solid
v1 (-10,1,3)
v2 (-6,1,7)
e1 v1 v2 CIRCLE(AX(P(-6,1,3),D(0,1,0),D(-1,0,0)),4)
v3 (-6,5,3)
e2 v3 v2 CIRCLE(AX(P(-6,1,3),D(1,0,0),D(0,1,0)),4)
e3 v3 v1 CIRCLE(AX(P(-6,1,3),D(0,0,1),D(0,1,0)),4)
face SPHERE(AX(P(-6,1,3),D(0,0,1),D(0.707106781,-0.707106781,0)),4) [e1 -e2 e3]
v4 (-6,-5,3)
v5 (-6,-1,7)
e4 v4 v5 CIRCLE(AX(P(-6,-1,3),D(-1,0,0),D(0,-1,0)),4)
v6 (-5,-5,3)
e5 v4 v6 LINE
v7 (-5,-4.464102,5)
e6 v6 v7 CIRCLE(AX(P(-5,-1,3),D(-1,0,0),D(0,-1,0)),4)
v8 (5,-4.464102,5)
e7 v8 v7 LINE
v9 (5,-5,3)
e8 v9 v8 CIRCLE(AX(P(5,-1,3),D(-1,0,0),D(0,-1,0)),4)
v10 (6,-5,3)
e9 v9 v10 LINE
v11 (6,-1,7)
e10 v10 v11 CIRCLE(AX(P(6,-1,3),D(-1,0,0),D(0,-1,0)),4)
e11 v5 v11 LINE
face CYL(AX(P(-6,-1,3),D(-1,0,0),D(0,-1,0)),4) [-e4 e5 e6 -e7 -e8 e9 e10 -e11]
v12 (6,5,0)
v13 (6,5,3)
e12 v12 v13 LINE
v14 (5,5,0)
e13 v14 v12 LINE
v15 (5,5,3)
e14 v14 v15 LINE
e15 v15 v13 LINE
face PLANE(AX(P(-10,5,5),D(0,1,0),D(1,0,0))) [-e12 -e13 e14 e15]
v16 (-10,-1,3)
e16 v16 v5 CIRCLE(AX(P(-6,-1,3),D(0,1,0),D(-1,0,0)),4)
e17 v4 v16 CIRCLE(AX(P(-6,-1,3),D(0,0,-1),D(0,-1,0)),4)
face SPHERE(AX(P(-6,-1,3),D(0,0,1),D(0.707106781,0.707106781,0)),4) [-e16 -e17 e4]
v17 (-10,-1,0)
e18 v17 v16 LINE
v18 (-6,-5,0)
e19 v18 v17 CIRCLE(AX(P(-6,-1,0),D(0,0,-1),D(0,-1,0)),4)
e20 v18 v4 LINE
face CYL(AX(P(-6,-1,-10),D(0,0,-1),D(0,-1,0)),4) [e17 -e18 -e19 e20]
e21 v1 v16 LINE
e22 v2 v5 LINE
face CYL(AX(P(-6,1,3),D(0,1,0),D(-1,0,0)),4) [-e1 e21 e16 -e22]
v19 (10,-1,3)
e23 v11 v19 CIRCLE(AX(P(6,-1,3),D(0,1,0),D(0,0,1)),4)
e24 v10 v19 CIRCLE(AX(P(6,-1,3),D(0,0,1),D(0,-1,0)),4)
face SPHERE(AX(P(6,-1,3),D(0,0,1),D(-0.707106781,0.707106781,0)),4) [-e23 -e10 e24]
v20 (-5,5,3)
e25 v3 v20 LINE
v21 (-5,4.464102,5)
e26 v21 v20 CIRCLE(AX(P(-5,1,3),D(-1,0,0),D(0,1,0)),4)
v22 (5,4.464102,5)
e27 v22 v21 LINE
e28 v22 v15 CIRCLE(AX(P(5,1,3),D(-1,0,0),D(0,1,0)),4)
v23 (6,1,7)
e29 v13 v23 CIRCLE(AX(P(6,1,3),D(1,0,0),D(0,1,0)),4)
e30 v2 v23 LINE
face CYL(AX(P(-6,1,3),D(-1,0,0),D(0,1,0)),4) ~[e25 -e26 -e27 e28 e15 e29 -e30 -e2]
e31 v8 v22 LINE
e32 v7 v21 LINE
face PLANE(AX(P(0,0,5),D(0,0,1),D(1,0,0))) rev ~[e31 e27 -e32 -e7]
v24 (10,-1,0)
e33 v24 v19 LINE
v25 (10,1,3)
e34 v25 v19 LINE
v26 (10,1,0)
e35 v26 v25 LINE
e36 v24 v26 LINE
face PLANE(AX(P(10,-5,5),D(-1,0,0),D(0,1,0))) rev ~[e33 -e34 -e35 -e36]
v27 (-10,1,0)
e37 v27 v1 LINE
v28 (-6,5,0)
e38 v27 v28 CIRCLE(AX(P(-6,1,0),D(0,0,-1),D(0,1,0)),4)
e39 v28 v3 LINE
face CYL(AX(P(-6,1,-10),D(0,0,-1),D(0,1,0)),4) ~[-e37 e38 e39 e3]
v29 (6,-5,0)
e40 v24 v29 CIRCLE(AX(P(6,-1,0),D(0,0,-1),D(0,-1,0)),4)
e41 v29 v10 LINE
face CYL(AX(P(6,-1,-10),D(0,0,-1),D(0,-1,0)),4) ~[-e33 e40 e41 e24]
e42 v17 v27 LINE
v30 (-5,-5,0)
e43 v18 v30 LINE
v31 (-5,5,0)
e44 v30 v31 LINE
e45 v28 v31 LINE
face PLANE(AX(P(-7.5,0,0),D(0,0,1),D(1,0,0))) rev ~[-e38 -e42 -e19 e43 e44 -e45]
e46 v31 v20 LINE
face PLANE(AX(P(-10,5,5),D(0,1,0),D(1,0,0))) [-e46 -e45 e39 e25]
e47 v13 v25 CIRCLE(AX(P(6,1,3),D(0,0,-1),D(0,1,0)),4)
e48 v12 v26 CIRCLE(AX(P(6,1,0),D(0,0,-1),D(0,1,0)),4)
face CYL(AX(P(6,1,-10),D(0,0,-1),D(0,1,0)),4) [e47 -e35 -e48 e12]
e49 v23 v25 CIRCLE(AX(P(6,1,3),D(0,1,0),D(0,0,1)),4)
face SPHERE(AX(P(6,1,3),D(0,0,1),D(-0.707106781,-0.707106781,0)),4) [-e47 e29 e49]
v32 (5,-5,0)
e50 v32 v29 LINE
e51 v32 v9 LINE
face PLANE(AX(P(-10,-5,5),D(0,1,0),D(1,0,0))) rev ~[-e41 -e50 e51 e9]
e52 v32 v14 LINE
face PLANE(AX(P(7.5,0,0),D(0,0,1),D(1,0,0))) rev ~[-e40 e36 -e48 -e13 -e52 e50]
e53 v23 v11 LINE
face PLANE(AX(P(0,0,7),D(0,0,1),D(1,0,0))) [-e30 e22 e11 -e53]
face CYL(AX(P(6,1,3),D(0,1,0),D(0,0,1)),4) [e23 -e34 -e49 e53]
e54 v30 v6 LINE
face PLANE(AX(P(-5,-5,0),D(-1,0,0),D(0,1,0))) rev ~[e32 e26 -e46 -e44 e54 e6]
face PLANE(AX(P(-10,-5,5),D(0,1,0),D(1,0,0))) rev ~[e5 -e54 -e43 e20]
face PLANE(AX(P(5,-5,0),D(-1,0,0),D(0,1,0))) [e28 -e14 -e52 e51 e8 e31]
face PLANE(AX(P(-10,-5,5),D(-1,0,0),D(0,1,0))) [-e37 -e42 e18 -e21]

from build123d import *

# Parameters (mm, degrees)
F0_W         = 5
F0_H         = 10
F1_DEPTH     = 5
F2_W         = 20
F2_H         = 10
F3_DEPTH     = 2
F4_T1_DEPTH  = 2
F4_T3_DEPTH  = 12
F4_T5_DEPTH  = 13
F4_S9_W      = 4
F4_S9_H      = 4
F4_T10_DEPTH = 4
F4_S15_W     = 4
F4_S15_H     = 4
F4_T16_DEPTH = 4
F4_S21_W     = 4
F4_S21_H     = 4
F4_T22_DEPTH = 4
F4_S27_W     = 4
F4_S27_H     = 4
F4_T28_DEPTH = 4


# Not quite as in the source:
# - a fillet or chamfer that OpenCascade refuses, or shapes differently, is made with other operations: its cross-section is extruded or revolved along the edge and cut away or added


with BuildPart() as f1:
    # F0 (on Top) → F1 (new body)
    with BuildSketch(Plane.XY):
        with Locations((-7.5, 0)):
            Rectangle(F0_W, F0_H)
    extrude(amount=F1_DEPTH)



with BuildPart() as f1b:
    # F0 (on Top) → F1, piece 2 (new body)
    with BuildSketch(Plane.XY):
        with Locations((7.5, 0)):
            Rectangle(F0_W, F0_H)
    extrude(amount=F1_DEPTH)


with BuildPart() as f1_1:
    add(f1.part)

    add(f1b.part)  # F3 merges F1b
    # F2 (on face) → F3 (join)
    with BuildSketch(Plane.XY.offset(5)):
        Rectangle(F2_W, F2_H)
    extrude(amount=F3_DEPTH)

    # F4: fillet of radius 4 on 8 edges, made by hand

    # F4_s2 → F4_t1 (cut)
    with BuildSketch(Plane.XZ.offset(-1)):
        with BuildLine():
            ThreePointArc((-10, 3), (-8.8284271247, 5.8284271247), (-6, 7))
            Line((-6, 7), (-10, 7))
            Line((-10, 7), (-10, 3))
        make_face()
        with BuildLine():
            ThreePointArc((6, 7), (8.8284271247, 5.8284271247), (10, 3))
            Line((10, 3), (10, 7))
            Line((10, 7), (6, 7))
        make_face()
    extrude(amount=F4_T1_DEPTH, mode=Mode.SUBTRACT)

    # F4_s4 → F4_t3 (cut)
    with BuildSketch(Plane.YZ.offset(-6)):
        with BuildLine():
            ThreePointArc((-5, 3), (-3.8284271247, 5.8284271247), (-1, 7))
            Line((-1, 7), (-5, 7))
            Line((-5, 7), (-5, 3))
        make_face()
        with BuildLine():
            ThreePointArc((5, 3), (3.8284271247, 5.8284271247), (1, 7))
            Line((1, 7), (5, 7))
            Line((5, 7), (5, 3))
        make_face()
    extrude(amount=F4_T3_DEPTH, mode=Mode.SUBTRACT)

    # F4_s6 → F4_t5 (cut)
    with BuildSketch(Plane.XY.offset(-10)):
        with BuildLine():
            ThreePointArc((6, -5), (8.8284271247, -3.8284271247), (10, -1))
            Line((10, -1), (10, -5))
            Line((10, -5), (6, -5))
        make_face()
        with BuildLine():
            ThreePointArc((6, 5), (8.8284271247, 3.8284271247), (10, 1))
            Line((10, 1), (10, 5))
            Line((10, 5), (6, 5))
        make_face()
        with BuildLine():
            ThreePointArc((-6, 5), (-8.8284271247, 3.8284271247), (-10, 1))
            Line((-10, 1), (-10, 5))
            Line((-10, 5), (-6, 5))
        make_face()
        with BuildLine():
            ThreePointArc((-6, -5), (-8.8284271247, -3.8284271247), (-10, -1))
            Line((-10, -1), (-10, -5))
            Line((-10, -5), (-6, -5))
        make_face()
    extrude(amount=F4_T5_DEPTH, mode=Mode.SUBTRACT)


with BuildPart() as f4_tool8:
    # F4_s9 → F4_t10 (new body)
    with BuildSketch(Plane.XY.offset(3)):
        with Locations((-8, 3)):
            Rectangle(F4_S9_W, F4_S9_H)
    extrude(amount=F4_T10_DEPTH)

    # F4_s11 → F4_t12 (revolve, cut)
    with BuildSketch(Plane(origin=(-6, 1, 3), x_dir=(0.7071067812, -0.7071067812, 0), z_dir=(-0.7071067812, -0.7071067812, 0))):
        with BuildLine():
            ThreePointArc((0, -4), (4, 0), (0, 4))
            Line((0, 4), (0, -4))
        make_face()
    revolve(axis=Axis((-6, 1, 3), (0, 0, 1)), mode=Mode.SUBTRACT)


with BuildPart() as f1_2:
    add(f1_1.part)

    # F4_t7: cut F4_tool8
    add(f4_tool8.part, mode=Mode.SUBTRACT)


with BuildPart() as f4_tool14:
    # F4_s15 → F4_t16 (new body)
    with BuildSketch(Plane.XY.offset(3)):
        with Locations((-8, -3)):
            Rectangle(F4_S15_W, F4_S15_H)
    extrude(amount=F4_T16_DEPTH)

    # F4_s17 → F4_t18 (revolve, cut)
    with BuildSketch(Plane(origin=(-6, -1, 3), x_dir=(0.7071067812, 0.7071067812, 0), z_dir=(0.7071067812, -0.7071067812, 0))):
        with BuildLine():
            ThreePointArc((0, -4), (4, 0), (0, 4))
            Line((0, 4), (0, -4))
        make_face()
    revolve(axis=Axis((-6, -1, 3), (0, 0, 1)), mode=Mode.SUBTRACT)


with BuildPart() as f1_3:
    add(f1_2.part)

    # F4_t13: cut F4_tool14
    add(f4_tool14.part, mode=Mode.SUBTRACT)


with BuildPart() as f4_tool20:
    # F4_s21 → F4_t22 (new body)
    with BuildSketch(Plane.XY.offset(3)):
        with Locations((8, -3)):
            Rectangle(F4_S21_W, F4_S21_H)
    extrude(amount=F4_T22_DEPTH)

    # F4_s23 → F4_t24 (revolve, cut)
    with BuildSketch(Plane(origin=(6, -1, 3), x_dir=(-0.7071067812, 0.7071067812, 0), z_dir=(0.7071067812, 0.7071067812, 0))):
        with BuildLine():
            ThreePointArc((0, -4), (4, 0), (0, 4))
            Line((0, 4), (0, -4))
        make_face()
    revolve(axis=Axis((6, -1, 3), (0, 0, 1)), mode=Mode.SUBTRACT)


with BuildPart() as f1_4:
    add(f1_3.part)

    # F4_t19: cut F4_tool20
    add(f4_tool20.part, mode=Mode.SUBTRACT)


with BuildPart() as f4_tool26:
    # F4_s27 → F4_t28 (new body)
    with BuildSketch(Plane.XY.offset(3)):
        with Locations((8, 3)):
            Rectangle(F4_S27_W, F4_S27_H)
    extrude(amount=F4_T28_DEPTH)

    # F4_s29 → F4_t30 (revolve, cut)
    with BuildSketch(Plane(origin=(6, 1, 3), x_dir=(-0.7071067812, -0.7071067812, 0), z_dir=(-0.7071067812, 0.7071067812, 0))):
        with BuildLine():
            ThreePointArc((0, -4), (4, 0), (0, 4))
            Line((0, 4), (0, -4))
        make_face()
    revolve(axis=Axis((6, 1, 3), (0, 0, 1)), mode=Mode.SUBTRACT)


with BuildPart() as f1_5:
    add(f1_4.part)

    # F4_t25: cut F4_tool26
    add(f4_tool26.part, mode=Mode.SUBTRACT)


solid = f1_5.part
